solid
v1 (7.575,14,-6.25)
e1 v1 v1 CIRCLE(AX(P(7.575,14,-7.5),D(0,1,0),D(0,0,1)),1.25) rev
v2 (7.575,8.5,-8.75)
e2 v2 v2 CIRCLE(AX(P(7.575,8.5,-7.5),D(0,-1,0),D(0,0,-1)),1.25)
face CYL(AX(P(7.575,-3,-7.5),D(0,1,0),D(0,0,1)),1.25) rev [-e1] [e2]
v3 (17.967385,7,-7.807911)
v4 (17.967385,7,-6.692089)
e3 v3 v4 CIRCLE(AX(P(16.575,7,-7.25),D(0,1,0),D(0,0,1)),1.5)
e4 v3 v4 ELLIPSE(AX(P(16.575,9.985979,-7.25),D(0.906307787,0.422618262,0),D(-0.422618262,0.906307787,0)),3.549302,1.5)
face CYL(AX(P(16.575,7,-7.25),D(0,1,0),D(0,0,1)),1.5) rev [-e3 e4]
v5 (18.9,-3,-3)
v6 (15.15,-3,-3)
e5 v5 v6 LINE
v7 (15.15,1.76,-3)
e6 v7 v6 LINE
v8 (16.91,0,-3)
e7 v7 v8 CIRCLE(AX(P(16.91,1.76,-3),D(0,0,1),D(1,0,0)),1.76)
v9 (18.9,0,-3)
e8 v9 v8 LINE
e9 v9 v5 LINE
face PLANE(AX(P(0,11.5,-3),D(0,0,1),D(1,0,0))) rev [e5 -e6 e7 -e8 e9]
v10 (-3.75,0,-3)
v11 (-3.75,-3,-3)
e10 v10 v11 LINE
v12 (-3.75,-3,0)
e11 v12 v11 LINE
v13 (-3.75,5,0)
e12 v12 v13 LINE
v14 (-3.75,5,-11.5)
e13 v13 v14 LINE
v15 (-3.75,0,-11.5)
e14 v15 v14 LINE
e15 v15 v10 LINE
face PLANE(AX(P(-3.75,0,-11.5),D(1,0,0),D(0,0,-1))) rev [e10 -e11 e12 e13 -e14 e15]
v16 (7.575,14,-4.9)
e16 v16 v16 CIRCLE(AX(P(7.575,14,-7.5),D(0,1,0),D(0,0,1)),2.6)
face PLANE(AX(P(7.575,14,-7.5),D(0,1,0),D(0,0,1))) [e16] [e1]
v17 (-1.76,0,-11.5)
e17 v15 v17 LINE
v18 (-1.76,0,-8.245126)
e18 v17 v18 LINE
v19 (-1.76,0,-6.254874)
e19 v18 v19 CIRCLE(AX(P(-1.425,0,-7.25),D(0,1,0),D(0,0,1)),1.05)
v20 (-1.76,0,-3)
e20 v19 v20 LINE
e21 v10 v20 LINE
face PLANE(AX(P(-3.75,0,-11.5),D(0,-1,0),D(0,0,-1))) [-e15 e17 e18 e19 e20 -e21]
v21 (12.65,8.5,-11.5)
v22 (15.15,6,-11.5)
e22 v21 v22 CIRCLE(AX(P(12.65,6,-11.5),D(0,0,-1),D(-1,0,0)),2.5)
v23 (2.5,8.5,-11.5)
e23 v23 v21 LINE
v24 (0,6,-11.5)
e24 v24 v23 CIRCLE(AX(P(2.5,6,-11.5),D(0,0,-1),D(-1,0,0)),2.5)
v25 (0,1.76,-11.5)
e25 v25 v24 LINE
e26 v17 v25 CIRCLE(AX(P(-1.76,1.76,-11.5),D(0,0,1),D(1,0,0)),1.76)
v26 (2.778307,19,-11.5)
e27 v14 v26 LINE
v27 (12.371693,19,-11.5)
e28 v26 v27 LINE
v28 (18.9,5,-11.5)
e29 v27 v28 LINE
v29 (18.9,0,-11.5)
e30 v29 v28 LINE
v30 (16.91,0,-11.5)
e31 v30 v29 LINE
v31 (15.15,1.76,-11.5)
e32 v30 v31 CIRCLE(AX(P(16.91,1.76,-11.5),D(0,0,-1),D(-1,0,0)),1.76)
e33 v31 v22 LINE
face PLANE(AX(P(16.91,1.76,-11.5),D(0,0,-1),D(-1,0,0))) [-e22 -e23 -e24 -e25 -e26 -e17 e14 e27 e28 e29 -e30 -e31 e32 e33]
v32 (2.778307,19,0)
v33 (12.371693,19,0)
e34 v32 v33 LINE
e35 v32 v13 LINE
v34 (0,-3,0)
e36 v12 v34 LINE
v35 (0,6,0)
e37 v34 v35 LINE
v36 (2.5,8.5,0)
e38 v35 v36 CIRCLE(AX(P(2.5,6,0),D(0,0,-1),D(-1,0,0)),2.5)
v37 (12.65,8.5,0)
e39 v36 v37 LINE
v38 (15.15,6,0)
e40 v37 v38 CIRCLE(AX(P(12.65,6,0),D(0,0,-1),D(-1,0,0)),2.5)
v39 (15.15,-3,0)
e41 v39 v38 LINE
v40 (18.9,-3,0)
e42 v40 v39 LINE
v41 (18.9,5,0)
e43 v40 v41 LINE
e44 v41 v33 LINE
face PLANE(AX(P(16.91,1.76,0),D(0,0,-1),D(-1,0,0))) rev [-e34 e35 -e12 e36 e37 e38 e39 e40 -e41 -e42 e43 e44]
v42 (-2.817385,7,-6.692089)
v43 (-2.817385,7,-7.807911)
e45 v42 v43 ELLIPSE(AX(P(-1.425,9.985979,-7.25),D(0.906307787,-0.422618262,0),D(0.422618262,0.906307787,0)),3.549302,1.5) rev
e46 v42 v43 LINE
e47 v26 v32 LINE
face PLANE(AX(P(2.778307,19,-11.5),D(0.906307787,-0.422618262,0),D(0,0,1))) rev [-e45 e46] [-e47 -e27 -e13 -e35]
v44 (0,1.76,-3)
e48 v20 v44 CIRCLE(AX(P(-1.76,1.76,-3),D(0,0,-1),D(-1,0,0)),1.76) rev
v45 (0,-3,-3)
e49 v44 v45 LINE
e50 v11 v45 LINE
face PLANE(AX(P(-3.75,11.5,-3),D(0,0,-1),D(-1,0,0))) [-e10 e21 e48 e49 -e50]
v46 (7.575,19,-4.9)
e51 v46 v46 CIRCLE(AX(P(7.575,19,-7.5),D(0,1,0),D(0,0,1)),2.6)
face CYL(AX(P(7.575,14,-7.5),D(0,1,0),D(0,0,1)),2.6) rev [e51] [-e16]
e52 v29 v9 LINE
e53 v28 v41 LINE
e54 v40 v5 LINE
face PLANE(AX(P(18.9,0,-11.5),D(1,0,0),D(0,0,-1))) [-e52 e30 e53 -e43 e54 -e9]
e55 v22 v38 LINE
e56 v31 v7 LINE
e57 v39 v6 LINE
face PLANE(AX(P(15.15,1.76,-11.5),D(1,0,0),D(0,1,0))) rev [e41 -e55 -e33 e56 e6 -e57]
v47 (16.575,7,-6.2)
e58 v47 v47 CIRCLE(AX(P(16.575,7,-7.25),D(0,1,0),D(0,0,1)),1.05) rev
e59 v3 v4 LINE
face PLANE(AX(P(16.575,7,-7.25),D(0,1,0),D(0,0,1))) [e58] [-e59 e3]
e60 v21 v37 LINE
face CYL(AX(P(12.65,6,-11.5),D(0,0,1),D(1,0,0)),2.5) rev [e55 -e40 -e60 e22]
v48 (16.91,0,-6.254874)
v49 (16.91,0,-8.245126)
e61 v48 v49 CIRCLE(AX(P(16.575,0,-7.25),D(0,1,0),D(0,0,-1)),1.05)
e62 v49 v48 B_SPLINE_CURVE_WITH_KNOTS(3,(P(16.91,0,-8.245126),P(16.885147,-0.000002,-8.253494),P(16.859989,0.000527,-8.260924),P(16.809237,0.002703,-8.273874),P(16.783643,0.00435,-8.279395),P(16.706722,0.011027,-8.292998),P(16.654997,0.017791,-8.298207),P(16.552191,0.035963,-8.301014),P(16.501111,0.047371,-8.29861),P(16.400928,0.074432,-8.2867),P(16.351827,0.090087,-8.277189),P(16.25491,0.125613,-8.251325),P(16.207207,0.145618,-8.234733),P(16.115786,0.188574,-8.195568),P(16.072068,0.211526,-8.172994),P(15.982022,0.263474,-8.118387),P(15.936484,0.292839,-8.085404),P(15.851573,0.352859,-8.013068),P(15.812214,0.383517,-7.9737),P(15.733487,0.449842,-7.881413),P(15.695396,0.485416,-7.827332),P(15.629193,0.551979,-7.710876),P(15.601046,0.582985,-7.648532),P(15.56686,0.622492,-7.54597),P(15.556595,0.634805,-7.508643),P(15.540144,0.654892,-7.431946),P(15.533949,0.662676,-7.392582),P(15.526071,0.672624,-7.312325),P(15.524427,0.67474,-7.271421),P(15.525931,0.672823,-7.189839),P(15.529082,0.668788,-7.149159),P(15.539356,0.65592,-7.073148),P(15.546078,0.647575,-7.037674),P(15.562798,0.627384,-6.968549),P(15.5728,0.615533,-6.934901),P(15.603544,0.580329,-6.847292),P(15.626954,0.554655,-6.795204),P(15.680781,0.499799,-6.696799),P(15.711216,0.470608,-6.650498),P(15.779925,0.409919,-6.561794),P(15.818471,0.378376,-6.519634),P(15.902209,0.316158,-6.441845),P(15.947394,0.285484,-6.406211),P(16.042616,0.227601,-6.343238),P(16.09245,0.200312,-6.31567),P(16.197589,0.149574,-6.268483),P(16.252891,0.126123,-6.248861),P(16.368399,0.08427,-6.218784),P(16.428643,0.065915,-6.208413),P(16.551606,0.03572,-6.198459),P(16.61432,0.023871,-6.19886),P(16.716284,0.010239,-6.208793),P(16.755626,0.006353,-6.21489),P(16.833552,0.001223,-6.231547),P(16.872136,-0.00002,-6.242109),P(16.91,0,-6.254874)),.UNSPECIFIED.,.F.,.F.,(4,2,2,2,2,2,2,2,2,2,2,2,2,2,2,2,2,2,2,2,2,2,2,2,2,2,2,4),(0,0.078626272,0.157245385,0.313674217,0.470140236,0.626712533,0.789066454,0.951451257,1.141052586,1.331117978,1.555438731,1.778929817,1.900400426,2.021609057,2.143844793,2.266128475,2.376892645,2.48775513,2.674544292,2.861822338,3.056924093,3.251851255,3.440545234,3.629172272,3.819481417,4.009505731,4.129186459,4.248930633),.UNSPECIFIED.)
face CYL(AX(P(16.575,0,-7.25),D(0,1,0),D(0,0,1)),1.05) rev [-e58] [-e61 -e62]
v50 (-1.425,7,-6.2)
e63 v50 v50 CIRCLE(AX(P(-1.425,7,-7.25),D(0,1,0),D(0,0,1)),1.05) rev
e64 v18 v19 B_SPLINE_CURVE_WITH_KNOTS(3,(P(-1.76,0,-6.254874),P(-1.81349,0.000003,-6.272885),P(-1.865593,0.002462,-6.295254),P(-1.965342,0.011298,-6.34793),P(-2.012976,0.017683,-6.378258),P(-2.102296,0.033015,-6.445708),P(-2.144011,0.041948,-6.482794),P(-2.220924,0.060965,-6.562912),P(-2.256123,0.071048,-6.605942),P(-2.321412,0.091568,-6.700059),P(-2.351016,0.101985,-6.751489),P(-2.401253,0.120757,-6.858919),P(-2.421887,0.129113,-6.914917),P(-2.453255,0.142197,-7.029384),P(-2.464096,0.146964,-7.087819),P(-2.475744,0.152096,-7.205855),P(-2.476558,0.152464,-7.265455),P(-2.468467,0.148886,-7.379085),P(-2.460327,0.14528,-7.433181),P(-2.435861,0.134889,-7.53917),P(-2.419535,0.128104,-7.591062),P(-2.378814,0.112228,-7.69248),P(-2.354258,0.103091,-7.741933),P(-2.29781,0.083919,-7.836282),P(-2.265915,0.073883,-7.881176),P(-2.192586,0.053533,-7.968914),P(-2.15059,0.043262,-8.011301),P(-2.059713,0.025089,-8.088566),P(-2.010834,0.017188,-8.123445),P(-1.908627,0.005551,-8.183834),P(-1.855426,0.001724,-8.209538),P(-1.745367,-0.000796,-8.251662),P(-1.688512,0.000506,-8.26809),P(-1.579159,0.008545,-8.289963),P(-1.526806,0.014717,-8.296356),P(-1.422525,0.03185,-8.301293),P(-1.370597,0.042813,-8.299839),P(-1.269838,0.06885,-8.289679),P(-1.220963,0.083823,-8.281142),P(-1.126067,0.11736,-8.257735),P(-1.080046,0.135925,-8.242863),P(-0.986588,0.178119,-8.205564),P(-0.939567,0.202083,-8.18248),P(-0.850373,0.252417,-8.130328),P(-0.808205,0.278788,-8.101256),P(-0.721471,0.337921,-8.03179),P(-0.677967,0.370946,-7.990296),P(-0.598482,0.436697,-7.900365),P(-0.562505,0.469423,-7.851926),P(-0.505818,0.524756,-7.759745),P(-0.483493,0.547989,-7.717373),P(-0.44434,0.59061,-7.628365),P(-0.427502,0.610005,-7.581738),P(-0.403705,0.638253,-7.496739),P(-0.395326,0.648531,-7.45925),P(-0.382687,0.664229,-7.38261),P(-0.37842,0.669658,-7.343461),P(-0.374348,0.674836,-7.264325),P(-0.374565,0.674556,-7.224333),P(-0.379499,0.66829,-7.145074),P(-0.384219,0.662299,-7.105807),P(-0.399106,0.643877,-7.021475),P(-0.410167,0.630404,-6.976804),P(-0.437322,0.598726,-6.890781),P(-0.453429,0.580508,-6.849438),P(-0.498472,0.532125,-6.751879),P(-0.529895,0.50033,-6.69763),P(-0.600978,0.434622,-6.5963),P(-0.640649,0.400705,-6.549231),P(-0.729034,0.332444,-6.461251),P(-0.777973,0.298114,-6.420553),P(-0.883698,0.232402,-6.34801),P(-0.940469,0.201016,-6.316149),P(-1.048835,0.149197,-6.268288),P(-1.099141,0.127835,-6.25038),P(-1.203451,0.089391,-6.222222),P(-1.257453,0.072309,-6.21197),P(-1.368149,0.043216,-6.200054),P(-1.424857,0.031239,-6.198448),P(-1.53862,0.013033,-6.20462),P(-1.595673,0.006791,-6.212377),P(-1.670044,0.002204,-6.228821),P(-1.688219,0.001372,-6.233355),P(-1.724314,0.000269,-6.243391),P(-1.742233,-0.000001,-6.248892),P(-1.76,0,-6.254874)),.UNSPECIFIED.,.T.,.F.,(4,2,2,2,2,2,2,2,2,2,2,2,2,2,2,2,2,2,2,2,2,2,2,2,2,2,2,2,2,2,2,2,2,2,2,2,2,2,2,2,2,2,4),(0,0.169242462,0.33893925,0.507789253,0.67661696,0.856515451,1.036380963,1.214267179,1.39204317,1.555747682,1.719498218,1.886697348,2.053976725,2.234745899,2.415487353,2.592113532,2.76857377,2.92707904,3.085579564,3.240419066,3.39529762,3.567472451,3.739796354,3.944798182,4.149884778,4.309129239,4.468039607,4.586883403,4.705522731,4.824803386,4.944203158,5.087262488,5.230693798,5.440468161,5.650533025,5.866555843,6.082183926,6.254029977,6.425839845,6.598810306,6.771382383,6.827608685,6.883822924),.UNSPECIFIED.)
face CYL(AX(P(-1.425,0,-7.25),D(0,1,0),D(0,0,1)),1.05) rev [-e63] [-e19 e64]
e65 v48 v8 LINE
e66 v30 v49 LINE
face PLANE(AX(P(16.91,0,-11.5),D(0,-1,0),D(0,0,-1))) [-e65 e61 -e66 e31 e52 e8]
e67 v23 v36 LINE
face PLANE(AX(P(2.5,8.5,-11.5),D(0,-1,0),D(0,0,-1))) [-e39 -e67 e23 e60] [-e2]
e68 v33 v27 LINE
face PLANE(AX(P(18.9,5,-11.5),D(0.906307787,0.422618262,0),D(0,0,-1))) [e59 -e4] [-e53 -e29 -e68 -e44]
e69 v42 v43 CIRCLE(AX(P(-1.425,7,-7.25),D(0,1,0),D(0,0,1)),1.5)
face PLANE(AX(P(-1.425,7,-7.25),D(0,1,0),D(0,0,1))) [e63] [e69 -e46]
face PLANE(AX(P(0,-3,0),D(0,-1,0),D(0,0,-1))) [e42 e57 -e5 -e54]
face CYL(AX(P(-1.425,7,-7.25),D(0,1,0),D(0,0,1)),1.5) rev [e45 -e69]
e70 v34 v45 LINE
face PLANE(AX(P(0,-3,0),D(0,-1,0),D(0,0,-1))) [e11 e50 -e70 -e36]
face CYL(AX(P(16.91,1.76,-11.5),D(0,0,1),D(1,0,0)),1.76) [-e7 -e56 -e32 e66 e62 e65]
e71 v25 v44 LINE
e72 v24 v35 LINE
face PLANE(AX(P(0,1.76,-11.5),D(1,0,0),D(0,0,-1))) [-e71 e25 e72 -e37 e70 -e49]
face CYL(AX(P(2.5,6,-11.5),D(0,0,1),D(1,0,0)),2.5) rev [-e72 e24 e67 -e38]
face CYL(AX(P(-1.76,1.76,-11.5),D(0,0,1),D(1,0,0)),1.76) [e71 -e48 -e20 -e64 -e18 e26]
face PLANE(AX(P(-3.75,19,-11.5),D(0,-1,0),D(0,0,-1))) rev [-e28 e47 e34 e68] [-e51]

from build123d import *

# Parameters (mm, degrees)
BOSS_EXTRUDE1_DEPTH      = 11.5
CUT_EXTRUDE1_DEPTH       = 30.162647342
CUT_EXTRUDE1_DEPTH_BACK  = 30.162647342
SKETCH3_R                = 1.05
BOSS_EXTRUDE2_DEPTH      = 3
BOSS_EXTRUDE2_DEPTH_BACK = 11.5
SKETCH4_W                = 3.75
SKETCH4_H                = 3
CUT_EXTRUDE2_DEPTH       = 32.200320548
CUT_EXTRUDE2_DEPTH_BACK  = 32.200320548
SKETCH5_R                = 1.25
CHAMFER1_SIZE            = 6.528307214
CHAMFER1_SIZE_2          = 14
CHAMFER2_SIZE            = 6.528307214
CHAMFER2_SIZE_2          = 14
SKETCH6_R                = 2.6
CUT_EXTRUDE3_DEPTH       = 5
SKETCH7_R                = 1.5
CUT_EXTRUDE4_DEPTH       = 12


with BuildPart() as part:
    # Sketch1 → Boss-Extrude1 (new body)
    with BuildSketch(Plane.XY):
        with BuildLine():
            Line((16.91, 0), (18.9, 0))
            Line((18.9, 0), (18.9, 19))
            Line((18.9, 19), (-3.75, 19))
            Line((-3.75, 19), (-3.75, 0))
            Line((-3.75, 0), (-1.76, 0))
            ThreePointArc((-1.76, 0), (-0.515492065, 0.515492065), (0, 1.76))
            Line((0, 1.76), (0, 6))
            ThreePointArc((0, 6), (0.732233047, 7.767766953), (2.5, 8.5))
            Line((2.5, 8.5), (12.65, 8.5))
            ThreePointArc((12.65, 8.5), (14.417766953, 7.767766953), (15.15, 6))
            Line((15.15, 6), (15.15, 1.76))
            ThreePointArc((15.15, 1.76), (15.665492065, 0.515492065), (16.91, 0))
        make_face()
    extrude(amount=-BOSS_EXTRUDE1_DEPTH)

    # Sketch3 → Cut-Extrude1 (cut, two sides: drawn at the far end of the back side and taken through both)
    with BuildSketch(Plane(origin=(0, 19, 0), x_dir=(1, 0, 0), z_dir=(0, 1, 0)).offset(-CUT_EXTRUDE1_DEPTH_BACK)):
        with Locations(Location((-1.425, 7.25, 0), (0, 0, 251.394661296))):
            Circle(SKETCH3_R)
        with Locations(Location((16.575, 7.25, 0), (0, 0, 288.605338704))):
            Circle(SKETCH3_R)
    extrude(amount=CUT_EXTRUDE1_DEPTH + CUT_EXTRUDE1_DEPTH_BACK, mode=Mode.SUBTRACT)

    # Sketch4 → Boss-Extrude2 (add, two sides: drawn at the far end of the back side and taken through both)
    with BuildSketch(Plane.XZ.offset(-BOSS_EXTRUDE2_DEPTH_BACK)):
        with Locations((17.025, -1.5)):
            Rectangle(SKETCH4_W, SKETCH4_H)
        with Locations((-1.875, -1.5)):
            Rectangle(SKETCH4_W, SKETCH4_H)
    extrude(amount=BOSS_EXTRUDE2_DEPTH + BOSS_EXTRUDE2_DEPTH_BACK)

    # Sketch5 → Cut-Extrude2 (cut, two sides: drawn at the far end of the back side and taken through both)
    with BuildSketch(Plane(origin=(0, 19, 0), x_dir=(1, 0, 0), z_dir=(0, 1, 0)).offset(-CUT_EXTRUDE2_DEPTH_BACK)):
        with Locations(Location((7.575, 7.5, 0), (0, 0, 90))):
            Circle(SKETCH5_R)
    extrude(amount=CUT_EXTRUDE2_DEPTH + CUT_EXTRUDE2_DEPTH_BACK, mode=Mode.SUBTRACT)

    # Chamfer1
    # the kernel refuses this chamfer: 14, 6.528307214 mm, written as the material it takes off along each edge
    with BuildSketch(Plane(origin=(-3.75, 19, 36.2736566), x_dir=(0.9971975577536776, 0.07481330637059945, 0), z_dir=(0, 0, -1))) as chamfer1_piece_1:
        Polygon((CHAMFER1_SIZE * 0.99719755778, CHAMFER1_SIZE * 0.0748133063725), (-CHAMFER1_SIZE_2 * 0.0748133063706, CHAMFER1_SIZE_2 * 0.997197557754), (0, 0), align=None)
    extrude(amount=84.0473132, mode=Mode.SUBTRACT)

    # Chamfer2
    # the kernel refuses this chamfer: 14, 6.528307214 mm, written as the material it takes off along each edge
    with BuildSketch(Plane(origin=(18.9, 19, 36.2736566), x_dir=(-0.9971975577536776, 0.07481330637059945, 0), z_dir=(0, 0, -1))) as chamfer2_piece_1:
        Polygon((CHAMFER2_SIZE * 0.99719755778, -CHAMFER2_SIZE * 0.0748133063725), (-CHAMFER2_SIZE_2 * 0.0748133063706, -CHAMFER2_SIZE_2 * 0.997197557754), (0, 0), align=None)
    extrude(amount=84.0473132, mode=Mode.SUBTRACT)

    # Sketch6 → Cut-Extrude3 (cut)
    with BuildSketch(Plane(origin=(0, 19, 0), x_dir=(1, 0, 0), z_dir=(0, 1, 0))):
        with Locations(Location((7.575, 7.5, 0), (0, 0, 270))):
            Circle(SKETCH6_R)
    extrude(amount=-CUT_EXTRUDE3_DEPTH, mode=Mode.SUBTRACT)

    # Sketch7 → Cut-Extrude4 (cut)
    with BuildSketch(Plane(origin=(0, 19, 0), x_dir=(1, 0, 0), z_dir=(0, 1, 0))):
        with Locations((-1.425, 7.25)):
            Circle(SKETCH7_R)
        with Locations((16.575, 7.25)):
            Circle(SKETCH7_R)
    extrude(amount=-CUT_EXTRUDE4_DEPTH, mode=Mode.SUBTRACT)


solid = part.part
